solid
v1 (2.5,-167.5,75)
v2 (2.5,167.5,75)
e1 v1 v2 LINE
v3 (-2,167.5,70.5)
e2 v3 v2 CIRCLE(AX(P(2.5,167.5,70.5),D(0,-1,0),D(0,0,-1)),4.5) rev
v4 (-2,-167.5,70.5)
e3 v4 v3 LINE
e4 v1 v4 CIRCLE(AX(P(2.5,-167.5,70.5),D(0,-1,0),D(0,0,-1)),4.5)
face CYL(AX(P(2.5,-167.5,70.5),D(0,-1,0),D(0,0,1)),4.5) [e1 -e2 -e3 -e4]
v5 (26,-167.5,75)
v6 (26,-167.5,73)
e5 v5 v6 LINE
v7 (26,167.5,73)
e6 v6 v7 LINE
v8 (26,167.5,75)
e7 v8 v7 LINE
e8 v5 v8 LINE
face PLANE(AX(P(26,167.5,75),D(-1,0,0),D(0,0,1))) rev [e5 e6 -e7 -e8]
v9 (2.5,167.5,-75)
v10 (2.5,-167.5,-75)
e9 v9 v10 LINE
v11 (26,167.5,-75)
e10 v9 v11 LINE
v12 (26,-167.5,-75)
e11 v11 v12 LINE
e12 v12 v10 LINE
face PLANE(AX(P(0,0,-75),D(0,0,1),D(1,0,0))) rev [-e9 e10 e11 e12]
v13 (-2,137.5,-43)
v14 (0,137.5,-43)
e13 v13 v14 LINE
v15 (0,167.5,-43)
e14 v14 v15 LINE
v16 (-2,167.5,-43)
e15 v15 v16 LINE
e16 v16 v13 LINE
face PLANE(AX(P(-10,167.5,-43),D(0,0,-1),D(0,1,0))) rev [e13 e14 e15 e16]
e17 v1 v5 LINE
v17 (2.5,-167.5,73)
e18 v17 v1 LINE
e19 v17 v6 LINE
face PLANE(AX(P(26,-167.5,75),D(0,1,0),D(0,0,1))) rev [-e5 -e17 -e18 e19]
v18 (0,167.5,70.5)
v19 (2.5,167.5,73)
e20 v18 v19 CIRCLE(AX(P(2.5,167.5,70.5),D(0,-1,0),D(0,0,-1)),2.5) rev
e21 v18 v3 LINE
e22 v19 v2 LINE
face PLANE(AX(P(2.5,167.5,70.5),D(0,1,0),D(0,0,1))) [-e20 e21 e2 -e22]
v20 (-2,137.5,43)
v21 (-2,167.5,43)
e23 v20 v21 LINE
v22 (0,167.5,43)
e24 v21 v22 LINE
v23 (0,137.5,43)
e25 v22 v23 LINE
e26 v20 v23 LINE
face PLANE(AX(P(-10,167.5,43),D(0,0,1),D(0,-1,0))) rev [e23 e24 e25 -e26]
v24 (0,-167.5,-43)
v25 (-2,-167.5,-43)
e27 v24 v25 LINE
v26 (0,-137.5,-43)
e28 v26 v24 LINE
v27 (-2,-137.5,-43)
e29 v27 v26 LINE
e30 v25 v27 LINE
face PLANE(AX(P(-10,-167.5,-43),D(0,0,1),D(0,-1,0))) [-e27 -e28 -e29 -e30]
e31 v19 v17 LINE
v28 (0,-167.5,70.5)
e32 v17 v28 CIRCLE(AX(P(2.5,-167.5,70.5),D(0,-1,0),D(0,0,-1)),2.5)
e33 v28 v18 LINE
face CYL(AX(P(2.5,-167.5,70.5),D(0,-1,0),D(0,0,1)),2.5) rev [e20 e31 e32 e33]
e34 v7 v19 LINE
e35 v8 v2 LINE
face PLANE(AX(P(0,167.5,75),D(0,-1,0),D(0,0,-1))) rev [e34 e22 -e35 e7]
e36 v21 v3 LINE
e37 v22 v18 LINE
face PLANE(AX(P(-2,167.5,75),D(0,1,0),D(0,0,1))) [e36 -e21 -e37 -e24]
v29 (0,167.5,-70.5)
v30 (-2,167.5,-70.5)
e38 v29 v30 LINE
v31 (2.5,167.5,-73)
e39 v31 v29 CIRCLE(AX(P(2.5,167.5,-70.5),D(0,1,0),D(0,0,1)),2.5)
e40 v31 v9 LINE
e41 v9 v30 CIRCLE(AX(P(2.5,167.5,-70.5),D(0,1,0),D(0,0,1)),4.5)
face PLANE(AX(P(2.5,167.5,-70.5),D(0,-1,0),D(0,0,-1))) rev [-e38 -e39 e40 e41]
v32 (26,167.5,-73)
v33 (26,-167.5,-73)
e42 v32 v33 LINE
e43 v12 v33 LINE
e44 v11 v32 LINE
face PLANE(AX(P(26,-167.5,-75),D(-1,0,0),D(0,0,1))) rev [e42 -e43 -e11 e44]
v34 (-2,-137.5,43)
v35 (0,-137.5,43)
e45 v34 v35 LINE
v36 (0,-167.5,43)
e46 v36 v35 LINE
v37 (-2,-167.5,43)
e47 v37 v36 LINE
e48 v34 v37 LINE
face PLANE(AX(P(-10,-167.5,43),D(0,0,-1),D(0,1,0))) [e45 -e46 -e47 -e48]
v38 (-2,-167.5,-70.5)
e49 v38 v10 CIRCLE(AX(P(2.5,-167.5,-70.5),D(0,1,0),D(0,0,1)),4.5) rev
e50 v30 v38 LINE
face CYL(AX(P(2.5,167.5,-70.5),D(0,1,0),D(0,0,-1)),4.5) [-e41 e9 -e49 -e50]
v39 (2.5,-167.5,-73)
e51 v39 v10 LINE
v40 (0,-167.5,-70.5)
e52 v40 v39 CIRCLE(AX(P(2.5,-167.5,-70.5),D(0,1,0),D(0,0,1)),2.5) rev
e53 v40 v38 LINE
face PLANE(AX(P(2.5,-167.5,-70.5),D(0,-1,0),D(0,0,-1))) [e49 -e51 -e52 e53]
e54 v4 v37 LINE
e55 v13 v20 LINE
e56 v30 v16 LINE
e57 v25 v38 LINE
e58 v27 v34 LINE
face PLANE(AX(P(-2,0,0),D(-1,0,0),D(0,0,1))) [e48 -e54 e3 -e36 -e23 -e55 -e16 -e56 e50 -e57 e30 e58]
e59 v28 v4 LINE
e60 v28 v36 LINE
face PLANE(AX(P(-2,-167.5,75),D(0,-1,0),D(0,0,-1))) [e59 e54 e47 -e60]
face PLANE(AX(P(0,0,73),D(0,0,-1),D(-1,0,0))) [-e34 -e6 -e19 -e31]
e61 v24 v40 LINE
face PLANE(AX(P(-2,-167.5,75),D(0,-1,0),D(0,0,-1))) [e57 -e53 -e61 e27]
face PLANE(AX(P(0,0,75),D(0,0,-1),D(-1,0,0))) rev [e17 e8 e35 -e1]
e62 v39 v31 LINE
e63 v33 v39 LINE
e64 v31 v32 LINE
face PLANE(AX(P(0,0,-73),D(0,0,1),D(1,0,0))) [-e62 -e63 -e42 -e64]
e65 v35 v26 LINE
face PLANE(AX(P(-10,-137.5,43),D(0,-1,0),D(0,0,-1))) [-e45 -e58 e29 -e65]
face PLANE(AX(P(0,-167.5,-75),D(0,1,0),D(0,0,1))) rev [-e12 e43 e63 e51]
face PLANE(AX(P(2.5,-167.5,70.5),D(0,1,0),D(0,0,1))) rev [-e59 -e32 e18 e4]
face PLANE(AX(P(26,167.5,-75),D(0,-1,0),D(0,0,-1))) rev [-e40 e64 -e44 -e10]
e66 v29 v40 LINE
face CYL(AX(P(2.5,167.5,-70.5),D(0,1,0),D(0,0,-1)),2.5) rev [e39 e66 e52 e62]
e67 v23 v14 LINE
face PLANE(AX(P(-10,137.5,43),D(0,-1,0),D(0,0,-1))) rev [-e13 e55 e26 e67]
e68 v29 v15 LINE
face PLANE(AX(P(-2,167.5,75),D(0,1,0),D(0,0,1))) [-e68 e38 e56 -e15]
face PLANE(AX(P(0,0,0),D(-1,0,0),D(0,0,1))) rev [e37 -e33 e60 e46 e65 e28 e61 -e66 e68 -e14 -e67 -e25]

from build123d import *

# Parameters (mm, degrees)
SKETCH1_W                      = 150
SKETCH1_H                      = 335
BASE_FLANGE1_DEPTH             = 2
EDGE_FLANGE1_STRIP_W           = 13
EDGE_FLANGE1_STRIP_H           = 2
EDGE_FLANGE1_STRIP_CUT_DEPTH   = 335
EDGE_FLANGE1_STRIP_2_W         = 13
EDGE_FLANGE1_STRIP_2_H         = 2
EDGE_FLANGE1_STRIP_CUT_2_DEPTH = 335
EDGE_FLANGE1_DEPTH             = 335
EDGE_FLANGE1_BEND_DEPTH        = 335
SKETCH11_W                     = 86
SKETCH11_H                     = 30
CUT_EXTRUDE1_DEPTH             = 10


# Sheet-metal steps are written as plain solids
with BuildPart() as part:
    # Sketch1 → Base-Flange1 (new body)
    with BuildSketch(Plane(origin=(0, 0, 0), x_dir=(0, 0, -1), z_dir=(1, 0, 0))):
        Rectangle(SKETCH1_W, SKETCH1_H)
    extrude(amount=-BASE_FLANGE1_DEPTH)

    # Edge-Flange1 strip (across the edge) → Edge-Flange1 strip cut (cut)
    with BuildSketch(Plane(origin=(0, -167.5, -75), x_dir=(0, 0, 1), z_dir=(0, 1, 0))):
        with Locations((-2, -1)):
            Rectangle(EDGE_FLANGE1_STRIP_W, EDGE_FLANGE1_STRIP_H)
    extrude(amount=EDGE_FLANGE1_STRIP_CUT_DEPTH, mode=Mode.SUBTRACT)

    # Edge-Flange1 strip 2 (across the edge) → Edge-Flange1 strip cut 2 (cut)
    with BuildSketch(Plane(origin=(0, 167.5, 75), x_dir=(0, 0, -1), z_dir=(0, -1, 0))):
        with Locations((-2, -1)):
            Rectangle(EDGE_FLANGE1_STRIP_2_W, EDGE_FLANGE1_STRIP_2_H)
    extrude(amount=EDGE_FLANGE1_STRIP_CUT_2_DEPTH, mode=Mode.SUBTRACT)

    # Edge-Flange1 section (across the edge) → Edge-Flange1 (add)
    with BuildSketch(Plane(origin=(0, -167.5, -75), x_dir=(0, 0, 1), z_dir=(0, 1, 0))):
        with BuildLine():
            Line((0, 2.5), (0, 26))
            Line((0, 26), (2, 26))
            Line((2, 26), (2, 2.5))
            ThreePointArc((2, 2.5), (2.732233047, 0.732233047), (4.5, 0))
            Line((4.5, 0), (4.5, -2))
            ThreePointArc((4.5, -2), (1.318019485, -0.681980515), (0, 2.5))
        make_face()
    extrude(amount=EDGE_FLANGE1_DEPTH)

    # Edge-Flange1 section 2 (across the edge) → Edge-Flange1 bend (add)
    with BuildSketch(Plane(origin=(0, 167.5, 75), x_dir=(0, 0, -1), z_dir=(0, -1, 0))):
        with BuildLine():
            Line((0, 2.5), (0, 26))
            Line((0, 26), (2, 26))
            Line((2, 26), (2, 2.5))
            ThreePointArc((2, 2.5), (2.732233047, 0.732233047), (4.5, 0))
            Line((4.5, 0), (4.5, -2))
            ThreePointArc((4.5, -2), (1.318019485, -0.681980515), (0, 2.5))
        make_face()
    extrude(amount=EDGE_FLANGE1_BEND_DEPTH)

    # Sketch11 → Cut-Extrude1 (cut)
    with BuildSketch(Plane(origin=(0, 0, 0), x_dir=(0, 0, -1), z_dir=(1, 0, 0))):
        with Locations((0, 152.5)):
            Rectangle(SKETCH11_W, SKETCH11_H)
    cut_extrude1 = extrude(amount=-CUT_EXTRUDE1_DEPTH, mode=Mode.SUBTRACT)

    # Mirror1: Cut-Extrude1 across plane
    add(cut_extrude1.mirror(Plane.ZX), mode=Mode.SUBTRACT)


solid = part.part
